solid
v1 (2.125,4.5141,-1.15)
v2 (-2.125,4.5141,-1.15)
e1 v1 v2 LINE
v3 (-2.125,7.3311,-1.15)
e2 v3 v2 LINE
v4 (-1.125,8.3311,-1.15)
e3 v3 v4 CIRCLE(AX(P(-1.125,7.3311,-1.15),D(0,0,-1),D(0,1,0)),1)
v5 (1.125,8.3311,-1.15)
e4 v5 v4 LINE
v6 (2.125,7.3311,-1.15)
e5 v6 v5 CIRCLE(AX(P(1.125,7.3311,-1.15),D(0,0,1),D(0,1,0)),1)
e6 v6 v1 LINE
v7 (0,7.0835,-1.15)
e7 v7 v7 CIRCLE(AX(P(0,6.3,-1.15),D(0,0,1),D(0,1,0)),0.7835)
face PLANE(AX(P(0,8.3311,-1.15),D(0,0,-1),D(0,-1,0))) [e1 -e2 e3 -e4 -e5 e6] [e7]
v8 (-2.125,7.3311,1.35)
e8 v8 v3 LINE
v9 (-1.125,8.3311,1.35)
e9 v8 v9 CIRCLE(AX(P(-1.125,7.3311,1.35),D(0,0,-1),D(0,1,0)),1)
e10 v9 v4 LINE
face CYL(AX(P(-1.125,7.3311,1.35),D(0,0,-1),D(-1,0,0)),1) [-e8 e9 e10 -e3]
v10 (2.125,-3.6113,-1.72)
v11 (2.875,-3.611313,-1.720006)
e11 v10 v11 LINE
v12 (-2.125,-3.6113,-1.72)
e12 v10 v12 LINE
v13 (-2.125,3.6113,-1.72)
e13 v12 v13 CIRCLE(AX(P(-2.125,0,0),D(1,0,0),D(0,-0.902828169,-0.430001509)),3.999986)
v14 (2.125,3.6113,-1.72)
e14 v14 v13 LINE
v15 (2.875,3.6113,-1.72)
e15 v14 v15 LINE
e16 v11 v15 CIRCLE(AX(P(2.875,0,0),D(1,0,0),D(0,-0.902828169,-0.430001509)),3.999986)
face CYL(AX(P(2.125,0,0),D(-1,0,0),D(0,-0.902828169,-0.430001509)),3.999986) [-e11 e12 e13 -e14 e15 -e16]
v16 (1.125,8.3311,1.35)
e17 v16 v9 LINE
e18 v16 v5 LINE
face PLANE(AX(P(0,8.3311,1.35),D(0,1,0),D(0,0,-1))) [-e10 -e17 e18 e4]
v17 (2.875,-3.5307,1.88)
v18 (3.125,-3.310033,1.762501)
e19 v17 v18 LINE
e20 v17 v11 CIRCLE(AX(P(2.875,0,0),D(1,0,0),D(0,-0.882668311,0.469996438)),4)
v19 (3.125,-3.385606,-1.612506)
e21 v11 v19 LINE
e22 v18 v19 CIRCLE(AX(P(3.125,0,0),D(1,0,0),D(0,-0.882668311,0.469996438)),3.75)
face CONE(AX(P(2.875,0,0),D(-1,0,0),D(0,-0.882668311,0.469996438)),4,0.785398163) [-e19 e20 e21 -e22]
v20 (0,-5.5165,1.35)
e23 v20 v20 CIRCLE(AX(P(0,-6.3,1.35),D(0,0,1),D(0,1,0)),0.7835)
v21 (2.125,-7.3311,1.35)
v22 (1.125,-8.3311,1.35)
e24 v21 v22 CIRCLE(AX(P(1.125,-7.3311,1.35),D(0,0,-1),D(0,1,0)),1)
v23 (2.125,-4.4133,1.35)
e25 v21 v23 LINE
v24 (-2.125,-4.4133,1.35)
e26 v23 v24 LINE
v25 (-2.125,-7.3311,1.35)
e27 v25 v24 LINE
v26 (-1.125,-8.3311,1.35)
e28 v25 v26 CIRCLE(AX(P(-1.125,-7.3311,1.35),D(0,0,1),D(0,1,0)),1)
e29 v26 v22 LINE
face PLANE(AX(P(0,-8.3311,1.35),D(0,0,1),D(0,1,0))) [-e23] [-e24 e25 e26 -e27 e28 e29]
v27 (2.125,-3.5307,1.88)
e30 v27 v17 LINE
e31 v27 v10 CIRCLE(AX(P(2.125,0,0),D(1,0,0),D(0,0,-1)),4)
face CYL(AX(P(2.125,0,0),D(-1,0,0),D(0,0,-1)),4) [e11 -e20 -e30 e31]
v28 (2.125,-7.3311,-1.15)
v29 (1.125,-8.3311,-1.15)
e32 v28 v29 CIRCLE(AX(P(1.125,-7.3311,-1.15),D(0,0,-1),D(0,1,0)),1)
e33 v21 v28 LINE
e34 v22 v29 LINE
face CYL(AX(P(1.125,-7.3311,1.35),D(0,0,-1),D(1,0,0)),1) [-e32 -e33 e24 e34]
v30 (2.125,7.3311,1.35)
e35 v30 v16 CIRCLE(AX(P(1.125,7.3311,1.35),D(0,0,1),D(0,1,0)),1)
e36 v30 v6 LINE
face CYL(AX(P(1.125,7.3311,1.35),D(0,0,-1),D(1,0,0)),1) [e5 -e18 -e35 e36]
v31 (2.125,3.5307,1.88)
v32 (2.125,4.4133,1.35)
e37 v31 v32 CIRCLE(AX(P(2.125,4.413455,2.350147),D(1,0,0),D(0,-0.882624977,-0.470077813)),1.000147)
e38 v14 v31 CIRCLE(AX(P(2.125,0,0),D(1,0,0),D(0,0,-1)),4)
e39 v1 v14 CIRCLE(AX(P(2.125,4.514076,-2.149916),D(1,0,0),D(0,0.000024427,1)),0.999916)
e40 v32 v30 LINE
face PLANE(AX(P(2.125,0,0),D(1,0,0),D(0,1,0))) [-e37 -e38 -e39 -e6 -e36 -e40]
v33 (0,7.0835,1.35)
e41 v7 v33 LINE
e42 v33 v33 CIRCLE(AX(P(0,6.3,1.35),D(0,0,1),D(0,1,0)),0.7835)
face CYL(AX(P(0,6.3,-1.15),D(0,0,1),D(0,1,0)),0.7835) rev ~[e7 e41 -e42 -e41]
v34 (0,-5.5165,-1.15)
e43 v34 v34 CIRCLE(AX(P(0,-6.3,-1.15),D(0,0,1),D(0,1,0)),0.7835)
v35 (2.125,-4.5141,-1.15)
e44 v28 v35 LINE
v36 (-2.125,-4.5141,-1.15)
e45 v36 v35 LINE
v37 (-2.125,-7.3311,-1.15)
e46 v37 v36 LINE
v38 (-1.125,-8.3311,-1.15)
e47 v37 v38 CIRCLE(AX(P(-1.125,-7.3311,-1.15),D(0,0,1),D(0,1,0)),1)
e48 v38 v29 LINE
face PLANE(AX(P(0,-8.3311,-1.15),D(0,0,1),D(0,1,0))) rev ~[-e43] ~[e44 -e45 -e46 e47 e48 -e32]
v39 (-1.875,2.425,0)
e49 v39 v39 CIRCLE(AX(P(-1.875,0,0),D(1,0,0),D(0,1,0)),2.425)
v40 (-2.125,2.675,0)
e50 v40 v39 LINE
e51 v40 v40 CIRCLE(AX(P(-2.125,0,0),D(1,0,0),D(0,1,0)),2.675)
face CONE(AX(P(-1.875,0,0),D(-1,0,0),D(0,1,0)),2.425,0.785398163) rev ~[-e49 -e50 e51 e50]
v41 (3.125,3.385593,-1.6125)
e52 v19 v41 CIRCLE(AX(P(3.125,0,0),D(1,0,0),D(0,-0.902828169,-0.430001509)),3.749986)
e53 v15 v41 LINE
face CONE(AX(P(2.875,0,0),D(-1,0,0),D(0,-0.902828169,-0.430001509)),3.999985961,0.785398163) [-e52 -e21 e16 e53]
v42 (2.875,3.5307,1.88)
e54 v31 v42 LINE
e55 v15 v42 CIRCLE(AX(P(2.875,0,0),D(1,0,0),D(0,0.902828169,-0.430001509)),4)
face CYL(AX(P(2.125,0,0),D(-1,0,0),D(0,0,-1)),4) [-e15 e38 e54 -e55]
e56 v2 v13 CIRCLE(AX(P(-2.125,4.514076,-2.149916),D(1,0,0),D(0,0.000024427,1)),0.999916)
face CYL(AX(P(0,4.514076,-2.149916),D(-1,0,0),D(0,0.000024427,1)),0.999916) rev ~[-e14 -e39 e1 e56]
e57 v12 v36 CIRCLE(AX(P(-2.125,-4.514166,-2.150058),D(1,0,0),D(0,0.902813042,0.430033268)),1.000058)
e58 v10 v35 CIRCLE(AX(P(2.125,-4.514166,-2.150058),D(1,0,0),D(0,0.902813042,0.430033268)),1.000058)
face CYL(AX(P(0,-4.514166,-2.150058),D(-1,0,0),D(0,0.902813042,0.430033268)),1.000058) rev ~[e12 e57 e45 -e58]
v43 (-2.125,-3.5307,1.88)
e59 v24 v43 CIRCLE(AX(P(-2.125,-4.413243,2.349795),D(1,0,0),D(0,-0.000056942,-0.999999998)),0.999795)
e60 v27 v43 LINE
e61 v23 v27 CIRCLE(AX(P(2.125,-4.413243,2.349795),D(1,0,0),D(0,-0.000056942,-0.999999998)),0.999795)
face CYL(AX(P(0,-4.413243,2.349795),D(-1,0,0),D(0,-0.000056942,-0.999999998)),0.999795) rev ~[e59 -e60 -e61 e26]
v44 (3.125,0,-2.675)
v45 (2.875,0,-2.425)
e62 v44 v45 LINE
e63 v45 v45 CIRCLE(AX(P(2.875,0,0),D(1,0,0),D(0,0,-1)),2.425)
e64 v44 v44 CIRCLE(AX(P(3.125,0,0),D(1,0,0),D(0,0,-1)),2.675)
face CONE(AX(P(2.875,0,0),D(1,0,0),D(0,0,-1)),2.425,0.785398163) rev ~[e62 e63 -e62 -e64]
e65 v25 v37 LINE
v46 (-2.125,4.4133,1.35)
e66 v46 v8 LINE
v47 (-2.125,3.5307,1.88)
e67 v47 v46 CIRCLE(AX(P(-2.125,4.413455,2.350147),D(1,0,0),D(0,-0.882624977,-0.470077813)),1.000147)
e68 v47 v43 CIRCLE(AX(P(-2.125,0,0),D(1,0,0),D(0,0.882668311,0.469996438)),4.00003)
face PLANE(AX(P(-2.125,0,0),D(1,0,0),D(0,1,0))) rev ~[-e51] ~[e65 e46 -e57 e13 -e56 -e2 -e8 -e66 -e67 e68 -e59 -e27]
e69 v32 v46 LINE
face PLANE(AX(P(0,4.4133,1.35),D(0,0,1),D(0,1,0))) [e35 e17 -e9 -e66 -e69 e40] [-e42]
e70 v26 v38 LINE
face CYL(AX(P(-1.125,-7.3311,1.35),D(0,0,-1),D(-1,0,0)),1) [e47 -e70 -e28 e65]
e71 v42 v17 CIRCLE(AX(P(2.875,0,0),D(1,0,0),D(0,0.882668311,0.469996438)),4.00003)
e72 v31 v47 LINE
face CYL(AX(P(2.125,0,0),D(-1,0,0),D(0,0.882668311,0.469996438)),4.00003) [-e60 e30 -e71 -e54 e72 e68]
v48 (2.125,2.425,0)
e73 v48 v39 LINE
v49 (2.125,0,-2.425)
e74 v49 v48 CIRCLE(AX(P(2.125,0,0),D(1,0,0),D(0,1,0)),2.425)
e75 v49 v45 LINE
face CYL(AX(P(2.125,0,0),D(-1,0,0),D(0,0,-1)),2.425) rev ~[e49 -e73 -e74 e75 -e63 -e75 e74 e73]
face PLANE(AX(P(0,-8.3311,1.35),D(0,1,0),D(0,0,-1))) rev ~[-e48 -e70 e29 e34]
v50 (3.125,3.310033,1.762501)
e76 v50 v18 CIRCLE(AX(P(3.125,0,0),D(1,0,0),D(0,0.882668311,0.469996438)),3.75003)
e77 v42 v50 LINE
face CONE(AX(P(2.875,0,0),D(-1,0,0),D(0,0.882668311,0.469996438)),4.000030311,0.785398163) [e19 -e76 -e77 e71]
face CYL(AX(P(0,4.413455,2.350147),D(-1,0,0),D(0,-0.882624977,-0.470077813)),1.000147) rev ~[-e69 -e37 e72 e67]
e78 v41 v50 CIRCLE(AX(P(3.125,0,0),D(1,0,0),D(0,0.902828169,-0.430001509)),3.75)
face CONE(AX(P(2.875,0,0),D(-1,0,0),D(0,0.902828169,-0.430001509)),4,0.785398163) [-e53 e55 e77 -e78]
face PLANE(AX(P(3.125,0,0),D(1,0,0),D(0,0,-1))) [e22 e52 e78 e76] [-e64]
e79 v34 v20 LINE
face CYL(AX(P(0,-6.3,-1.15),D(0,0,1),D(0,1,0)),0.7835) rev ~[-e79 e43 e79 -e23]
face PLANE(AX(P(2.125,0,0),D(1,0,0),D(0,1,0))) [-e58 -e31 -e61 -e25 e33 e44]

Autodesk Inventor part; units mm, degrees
ref_plane "YZ Plane" through (0, 0, 0) normal (1, 0, 0) x (0, 1, 0)
ref_plane "XZ Plane" through (0, 0, 0) normal (0, 1, 0) x (-1, 0, 0)
ref_plane "XY Plane" through (0, 0, 0) normal (0, 0, 1) x (1, 0, 0)
sketch "Sketch1" plane through (0, 0, 0) normal (1, 0, 0) x (0, 1, 0)
  circle A0 centre (0, 0) radius 2.3812 construction
  circle A1 centre (0, 0) radius 2.425
  line L0 (-8.3311, 1.35) -> (-8.3311, -1.15)
  line L1 (-8.3311, -1.15) -> (-4.5141, -1.15)
  line L2 (-8.3311, 1.35) -> (-4.4133, 1.35)
  arc A2 (3.5307, 1.88) -> (-3.5307, 1.88) centre (0, 0) ccw
  arc A3 (-3.6113, -1.72) -> (3.6113, -1.72) centre (0, 0) ccw
  line L3 (4.4133, 1.35) -> (8.3311, 1.35)
  line L4 (8.3311, 1.35) -> (8.3311, -1.15)
  line L5 (8.3311, -1.15) -> (4.5141, -1.15)
  arc A4 (-4.4133, 1.35) -> (-3.5307, 1.88) centre (-4.4133, 2.35) ccw
  arc A5 (-3.6113, -1.72) -> (-4.5141, -1.15) centre (-4.5141, -2.15) ccw
  arc A6 (4.5141, -1.15) -> (3.6113, -1.72) centre (4.5141, -2.15) ccw
  arc A7 (3.5307, 1.88) -> (4.4133, 1.35) centre (4.4133, 2.35) ccw
  point P0 (-3.8311, -1.15)
  point P1 (-3.7653, 1.35)
  point P2 (3.7653, 1.35)
  point P3 (3.8311, -1.15)
  dimension "d0" = 4.7625
  dimension "d1" = 4.85
  dimension "d2" = 0.0437
  dimension "d3" = 4
  dimension "d4" = 1.575
  dimension "d6" = 2.5
  dimension "d7" = 4.5
  dimension "d8" = 16.6623
  dimension "d9" = 1
  dimension "d25" = 1.35
extrude "Extrusion1" add sketch "Sketch1" along normal mid plane 4.25
sketch "Sketch2" plane through (2.125, 0, 0) normal (1, 0, 0) x (0, 0, -1)
  circle A0 centre (0, 0) radius 2.425 projected
  line L0 (-1.35, -8.3311) -> (1.15, -8.3311) projected
  line L1 (1.15, -8.3311) -> (1.15, -4.5141) projected
  arc A1 (1.72, -3.6113) -> (1.15, -4.5141) centre (2.15, -4.5141) ccw projected
  arc A2 (1.72, -3.6113) -> (1.72, 3.6113) centre (0, 0) ccw projected
  arc A3 (1.15, 4.5141) -> (1.72, 3.6113) centre (2.15, 4.5141) ccw projected
  line L2 (1.15, 4.5141) -> (1.15, 8.3311) projected
  line L3 (1.15, 8.3311) -> (-1.35, 8.3311) projected
  line L4 (-1.35, 8.3311) -> (-1.35, 4.4133) projected
  arc A4 (-1.88, 3.5307) -> (-1.35, 4.4133) centre (-2.35, 4.4133) ccw projected
  arc A5 (-1.88, 3.5307) -> (-1.88, -3.5307) centre (0, 0) ccw projected
  arc A6 (-1.35, -4.4133) -> (-1.88, -3.5307) centre (-2.35, -4.4133) ccw projected
  line L5 (-1.35, -4.4133) -> (-1.35, -8.3311) projected
  arc A7 (-1.88, 3.5307) -> (-1.88, -3.5307) centre (0, 0) ccw projected
  circle A8 centre (0, 0) radius 4
extrude "Extrusion2" add sketch "Sketch2" along normal blind 1 contours A5 A8 A2
chamfer "Chamfer1" distance 0.25 angle 45 3 edges at (3.125, 0, 4) (3.125, 0, 2.425) (-2.125, -2.425, 0)
sketch "Sketch3" plane through (2.125, -4.5141, -1.15) normal (0, 0, -1) x (-1, 0, 0)
  line L0 (4.25, 0) -> (0, 0) projected
  line L1 (0, -3.817) -> (0, 0) projected
  line L2 (4.25, -3.817) -> (0, -3.817) projected
  line L3 (4.25, 0) -> (4.25, -3.817) projected
  line L4 (4.25, 12.8453) -> (0, 12.8453) projected
  line L5 (0, 9.0283) -> (0, 12.8453) projected
  line L6 (4.25, 9.0283) -> (0, 9.0283) projected
  line L7 (4.25, 12.8453) -> (4.25, 9.0283) projected
  line L8 (2.125, -1.7859) -> (2.125, 10.8141) construction
  line L9 (4.25, 0.9028) -> (4.25, 8.1255) projected
  point P0 (2.125, 4.5141)
  point P1 (4.25, 4.5141)
  point P2 (2.125, -3.817)
  point P3 (2.125, 4.5141)
  dimension "d17" = 12.6
hole "Hole1" at (0, -6.3, -1.15) at (0, 6.3, -1.15) direction (0, 0, 1) diameter 1.567 end through all thread size "M2x0.4" class "6H" standard "ANSI Metric M Profile"
fillet "Fillet1" radius 1 4 edges at (-2.125, -8.3311, 0.1) (2.125, -8.3311, 0.1) (2.125, 8.3311, 0.1) (-2.125, 8.3311, 0.1)
properties part number "EPS_RBFPinHolder" material "Aluminum 6061"
